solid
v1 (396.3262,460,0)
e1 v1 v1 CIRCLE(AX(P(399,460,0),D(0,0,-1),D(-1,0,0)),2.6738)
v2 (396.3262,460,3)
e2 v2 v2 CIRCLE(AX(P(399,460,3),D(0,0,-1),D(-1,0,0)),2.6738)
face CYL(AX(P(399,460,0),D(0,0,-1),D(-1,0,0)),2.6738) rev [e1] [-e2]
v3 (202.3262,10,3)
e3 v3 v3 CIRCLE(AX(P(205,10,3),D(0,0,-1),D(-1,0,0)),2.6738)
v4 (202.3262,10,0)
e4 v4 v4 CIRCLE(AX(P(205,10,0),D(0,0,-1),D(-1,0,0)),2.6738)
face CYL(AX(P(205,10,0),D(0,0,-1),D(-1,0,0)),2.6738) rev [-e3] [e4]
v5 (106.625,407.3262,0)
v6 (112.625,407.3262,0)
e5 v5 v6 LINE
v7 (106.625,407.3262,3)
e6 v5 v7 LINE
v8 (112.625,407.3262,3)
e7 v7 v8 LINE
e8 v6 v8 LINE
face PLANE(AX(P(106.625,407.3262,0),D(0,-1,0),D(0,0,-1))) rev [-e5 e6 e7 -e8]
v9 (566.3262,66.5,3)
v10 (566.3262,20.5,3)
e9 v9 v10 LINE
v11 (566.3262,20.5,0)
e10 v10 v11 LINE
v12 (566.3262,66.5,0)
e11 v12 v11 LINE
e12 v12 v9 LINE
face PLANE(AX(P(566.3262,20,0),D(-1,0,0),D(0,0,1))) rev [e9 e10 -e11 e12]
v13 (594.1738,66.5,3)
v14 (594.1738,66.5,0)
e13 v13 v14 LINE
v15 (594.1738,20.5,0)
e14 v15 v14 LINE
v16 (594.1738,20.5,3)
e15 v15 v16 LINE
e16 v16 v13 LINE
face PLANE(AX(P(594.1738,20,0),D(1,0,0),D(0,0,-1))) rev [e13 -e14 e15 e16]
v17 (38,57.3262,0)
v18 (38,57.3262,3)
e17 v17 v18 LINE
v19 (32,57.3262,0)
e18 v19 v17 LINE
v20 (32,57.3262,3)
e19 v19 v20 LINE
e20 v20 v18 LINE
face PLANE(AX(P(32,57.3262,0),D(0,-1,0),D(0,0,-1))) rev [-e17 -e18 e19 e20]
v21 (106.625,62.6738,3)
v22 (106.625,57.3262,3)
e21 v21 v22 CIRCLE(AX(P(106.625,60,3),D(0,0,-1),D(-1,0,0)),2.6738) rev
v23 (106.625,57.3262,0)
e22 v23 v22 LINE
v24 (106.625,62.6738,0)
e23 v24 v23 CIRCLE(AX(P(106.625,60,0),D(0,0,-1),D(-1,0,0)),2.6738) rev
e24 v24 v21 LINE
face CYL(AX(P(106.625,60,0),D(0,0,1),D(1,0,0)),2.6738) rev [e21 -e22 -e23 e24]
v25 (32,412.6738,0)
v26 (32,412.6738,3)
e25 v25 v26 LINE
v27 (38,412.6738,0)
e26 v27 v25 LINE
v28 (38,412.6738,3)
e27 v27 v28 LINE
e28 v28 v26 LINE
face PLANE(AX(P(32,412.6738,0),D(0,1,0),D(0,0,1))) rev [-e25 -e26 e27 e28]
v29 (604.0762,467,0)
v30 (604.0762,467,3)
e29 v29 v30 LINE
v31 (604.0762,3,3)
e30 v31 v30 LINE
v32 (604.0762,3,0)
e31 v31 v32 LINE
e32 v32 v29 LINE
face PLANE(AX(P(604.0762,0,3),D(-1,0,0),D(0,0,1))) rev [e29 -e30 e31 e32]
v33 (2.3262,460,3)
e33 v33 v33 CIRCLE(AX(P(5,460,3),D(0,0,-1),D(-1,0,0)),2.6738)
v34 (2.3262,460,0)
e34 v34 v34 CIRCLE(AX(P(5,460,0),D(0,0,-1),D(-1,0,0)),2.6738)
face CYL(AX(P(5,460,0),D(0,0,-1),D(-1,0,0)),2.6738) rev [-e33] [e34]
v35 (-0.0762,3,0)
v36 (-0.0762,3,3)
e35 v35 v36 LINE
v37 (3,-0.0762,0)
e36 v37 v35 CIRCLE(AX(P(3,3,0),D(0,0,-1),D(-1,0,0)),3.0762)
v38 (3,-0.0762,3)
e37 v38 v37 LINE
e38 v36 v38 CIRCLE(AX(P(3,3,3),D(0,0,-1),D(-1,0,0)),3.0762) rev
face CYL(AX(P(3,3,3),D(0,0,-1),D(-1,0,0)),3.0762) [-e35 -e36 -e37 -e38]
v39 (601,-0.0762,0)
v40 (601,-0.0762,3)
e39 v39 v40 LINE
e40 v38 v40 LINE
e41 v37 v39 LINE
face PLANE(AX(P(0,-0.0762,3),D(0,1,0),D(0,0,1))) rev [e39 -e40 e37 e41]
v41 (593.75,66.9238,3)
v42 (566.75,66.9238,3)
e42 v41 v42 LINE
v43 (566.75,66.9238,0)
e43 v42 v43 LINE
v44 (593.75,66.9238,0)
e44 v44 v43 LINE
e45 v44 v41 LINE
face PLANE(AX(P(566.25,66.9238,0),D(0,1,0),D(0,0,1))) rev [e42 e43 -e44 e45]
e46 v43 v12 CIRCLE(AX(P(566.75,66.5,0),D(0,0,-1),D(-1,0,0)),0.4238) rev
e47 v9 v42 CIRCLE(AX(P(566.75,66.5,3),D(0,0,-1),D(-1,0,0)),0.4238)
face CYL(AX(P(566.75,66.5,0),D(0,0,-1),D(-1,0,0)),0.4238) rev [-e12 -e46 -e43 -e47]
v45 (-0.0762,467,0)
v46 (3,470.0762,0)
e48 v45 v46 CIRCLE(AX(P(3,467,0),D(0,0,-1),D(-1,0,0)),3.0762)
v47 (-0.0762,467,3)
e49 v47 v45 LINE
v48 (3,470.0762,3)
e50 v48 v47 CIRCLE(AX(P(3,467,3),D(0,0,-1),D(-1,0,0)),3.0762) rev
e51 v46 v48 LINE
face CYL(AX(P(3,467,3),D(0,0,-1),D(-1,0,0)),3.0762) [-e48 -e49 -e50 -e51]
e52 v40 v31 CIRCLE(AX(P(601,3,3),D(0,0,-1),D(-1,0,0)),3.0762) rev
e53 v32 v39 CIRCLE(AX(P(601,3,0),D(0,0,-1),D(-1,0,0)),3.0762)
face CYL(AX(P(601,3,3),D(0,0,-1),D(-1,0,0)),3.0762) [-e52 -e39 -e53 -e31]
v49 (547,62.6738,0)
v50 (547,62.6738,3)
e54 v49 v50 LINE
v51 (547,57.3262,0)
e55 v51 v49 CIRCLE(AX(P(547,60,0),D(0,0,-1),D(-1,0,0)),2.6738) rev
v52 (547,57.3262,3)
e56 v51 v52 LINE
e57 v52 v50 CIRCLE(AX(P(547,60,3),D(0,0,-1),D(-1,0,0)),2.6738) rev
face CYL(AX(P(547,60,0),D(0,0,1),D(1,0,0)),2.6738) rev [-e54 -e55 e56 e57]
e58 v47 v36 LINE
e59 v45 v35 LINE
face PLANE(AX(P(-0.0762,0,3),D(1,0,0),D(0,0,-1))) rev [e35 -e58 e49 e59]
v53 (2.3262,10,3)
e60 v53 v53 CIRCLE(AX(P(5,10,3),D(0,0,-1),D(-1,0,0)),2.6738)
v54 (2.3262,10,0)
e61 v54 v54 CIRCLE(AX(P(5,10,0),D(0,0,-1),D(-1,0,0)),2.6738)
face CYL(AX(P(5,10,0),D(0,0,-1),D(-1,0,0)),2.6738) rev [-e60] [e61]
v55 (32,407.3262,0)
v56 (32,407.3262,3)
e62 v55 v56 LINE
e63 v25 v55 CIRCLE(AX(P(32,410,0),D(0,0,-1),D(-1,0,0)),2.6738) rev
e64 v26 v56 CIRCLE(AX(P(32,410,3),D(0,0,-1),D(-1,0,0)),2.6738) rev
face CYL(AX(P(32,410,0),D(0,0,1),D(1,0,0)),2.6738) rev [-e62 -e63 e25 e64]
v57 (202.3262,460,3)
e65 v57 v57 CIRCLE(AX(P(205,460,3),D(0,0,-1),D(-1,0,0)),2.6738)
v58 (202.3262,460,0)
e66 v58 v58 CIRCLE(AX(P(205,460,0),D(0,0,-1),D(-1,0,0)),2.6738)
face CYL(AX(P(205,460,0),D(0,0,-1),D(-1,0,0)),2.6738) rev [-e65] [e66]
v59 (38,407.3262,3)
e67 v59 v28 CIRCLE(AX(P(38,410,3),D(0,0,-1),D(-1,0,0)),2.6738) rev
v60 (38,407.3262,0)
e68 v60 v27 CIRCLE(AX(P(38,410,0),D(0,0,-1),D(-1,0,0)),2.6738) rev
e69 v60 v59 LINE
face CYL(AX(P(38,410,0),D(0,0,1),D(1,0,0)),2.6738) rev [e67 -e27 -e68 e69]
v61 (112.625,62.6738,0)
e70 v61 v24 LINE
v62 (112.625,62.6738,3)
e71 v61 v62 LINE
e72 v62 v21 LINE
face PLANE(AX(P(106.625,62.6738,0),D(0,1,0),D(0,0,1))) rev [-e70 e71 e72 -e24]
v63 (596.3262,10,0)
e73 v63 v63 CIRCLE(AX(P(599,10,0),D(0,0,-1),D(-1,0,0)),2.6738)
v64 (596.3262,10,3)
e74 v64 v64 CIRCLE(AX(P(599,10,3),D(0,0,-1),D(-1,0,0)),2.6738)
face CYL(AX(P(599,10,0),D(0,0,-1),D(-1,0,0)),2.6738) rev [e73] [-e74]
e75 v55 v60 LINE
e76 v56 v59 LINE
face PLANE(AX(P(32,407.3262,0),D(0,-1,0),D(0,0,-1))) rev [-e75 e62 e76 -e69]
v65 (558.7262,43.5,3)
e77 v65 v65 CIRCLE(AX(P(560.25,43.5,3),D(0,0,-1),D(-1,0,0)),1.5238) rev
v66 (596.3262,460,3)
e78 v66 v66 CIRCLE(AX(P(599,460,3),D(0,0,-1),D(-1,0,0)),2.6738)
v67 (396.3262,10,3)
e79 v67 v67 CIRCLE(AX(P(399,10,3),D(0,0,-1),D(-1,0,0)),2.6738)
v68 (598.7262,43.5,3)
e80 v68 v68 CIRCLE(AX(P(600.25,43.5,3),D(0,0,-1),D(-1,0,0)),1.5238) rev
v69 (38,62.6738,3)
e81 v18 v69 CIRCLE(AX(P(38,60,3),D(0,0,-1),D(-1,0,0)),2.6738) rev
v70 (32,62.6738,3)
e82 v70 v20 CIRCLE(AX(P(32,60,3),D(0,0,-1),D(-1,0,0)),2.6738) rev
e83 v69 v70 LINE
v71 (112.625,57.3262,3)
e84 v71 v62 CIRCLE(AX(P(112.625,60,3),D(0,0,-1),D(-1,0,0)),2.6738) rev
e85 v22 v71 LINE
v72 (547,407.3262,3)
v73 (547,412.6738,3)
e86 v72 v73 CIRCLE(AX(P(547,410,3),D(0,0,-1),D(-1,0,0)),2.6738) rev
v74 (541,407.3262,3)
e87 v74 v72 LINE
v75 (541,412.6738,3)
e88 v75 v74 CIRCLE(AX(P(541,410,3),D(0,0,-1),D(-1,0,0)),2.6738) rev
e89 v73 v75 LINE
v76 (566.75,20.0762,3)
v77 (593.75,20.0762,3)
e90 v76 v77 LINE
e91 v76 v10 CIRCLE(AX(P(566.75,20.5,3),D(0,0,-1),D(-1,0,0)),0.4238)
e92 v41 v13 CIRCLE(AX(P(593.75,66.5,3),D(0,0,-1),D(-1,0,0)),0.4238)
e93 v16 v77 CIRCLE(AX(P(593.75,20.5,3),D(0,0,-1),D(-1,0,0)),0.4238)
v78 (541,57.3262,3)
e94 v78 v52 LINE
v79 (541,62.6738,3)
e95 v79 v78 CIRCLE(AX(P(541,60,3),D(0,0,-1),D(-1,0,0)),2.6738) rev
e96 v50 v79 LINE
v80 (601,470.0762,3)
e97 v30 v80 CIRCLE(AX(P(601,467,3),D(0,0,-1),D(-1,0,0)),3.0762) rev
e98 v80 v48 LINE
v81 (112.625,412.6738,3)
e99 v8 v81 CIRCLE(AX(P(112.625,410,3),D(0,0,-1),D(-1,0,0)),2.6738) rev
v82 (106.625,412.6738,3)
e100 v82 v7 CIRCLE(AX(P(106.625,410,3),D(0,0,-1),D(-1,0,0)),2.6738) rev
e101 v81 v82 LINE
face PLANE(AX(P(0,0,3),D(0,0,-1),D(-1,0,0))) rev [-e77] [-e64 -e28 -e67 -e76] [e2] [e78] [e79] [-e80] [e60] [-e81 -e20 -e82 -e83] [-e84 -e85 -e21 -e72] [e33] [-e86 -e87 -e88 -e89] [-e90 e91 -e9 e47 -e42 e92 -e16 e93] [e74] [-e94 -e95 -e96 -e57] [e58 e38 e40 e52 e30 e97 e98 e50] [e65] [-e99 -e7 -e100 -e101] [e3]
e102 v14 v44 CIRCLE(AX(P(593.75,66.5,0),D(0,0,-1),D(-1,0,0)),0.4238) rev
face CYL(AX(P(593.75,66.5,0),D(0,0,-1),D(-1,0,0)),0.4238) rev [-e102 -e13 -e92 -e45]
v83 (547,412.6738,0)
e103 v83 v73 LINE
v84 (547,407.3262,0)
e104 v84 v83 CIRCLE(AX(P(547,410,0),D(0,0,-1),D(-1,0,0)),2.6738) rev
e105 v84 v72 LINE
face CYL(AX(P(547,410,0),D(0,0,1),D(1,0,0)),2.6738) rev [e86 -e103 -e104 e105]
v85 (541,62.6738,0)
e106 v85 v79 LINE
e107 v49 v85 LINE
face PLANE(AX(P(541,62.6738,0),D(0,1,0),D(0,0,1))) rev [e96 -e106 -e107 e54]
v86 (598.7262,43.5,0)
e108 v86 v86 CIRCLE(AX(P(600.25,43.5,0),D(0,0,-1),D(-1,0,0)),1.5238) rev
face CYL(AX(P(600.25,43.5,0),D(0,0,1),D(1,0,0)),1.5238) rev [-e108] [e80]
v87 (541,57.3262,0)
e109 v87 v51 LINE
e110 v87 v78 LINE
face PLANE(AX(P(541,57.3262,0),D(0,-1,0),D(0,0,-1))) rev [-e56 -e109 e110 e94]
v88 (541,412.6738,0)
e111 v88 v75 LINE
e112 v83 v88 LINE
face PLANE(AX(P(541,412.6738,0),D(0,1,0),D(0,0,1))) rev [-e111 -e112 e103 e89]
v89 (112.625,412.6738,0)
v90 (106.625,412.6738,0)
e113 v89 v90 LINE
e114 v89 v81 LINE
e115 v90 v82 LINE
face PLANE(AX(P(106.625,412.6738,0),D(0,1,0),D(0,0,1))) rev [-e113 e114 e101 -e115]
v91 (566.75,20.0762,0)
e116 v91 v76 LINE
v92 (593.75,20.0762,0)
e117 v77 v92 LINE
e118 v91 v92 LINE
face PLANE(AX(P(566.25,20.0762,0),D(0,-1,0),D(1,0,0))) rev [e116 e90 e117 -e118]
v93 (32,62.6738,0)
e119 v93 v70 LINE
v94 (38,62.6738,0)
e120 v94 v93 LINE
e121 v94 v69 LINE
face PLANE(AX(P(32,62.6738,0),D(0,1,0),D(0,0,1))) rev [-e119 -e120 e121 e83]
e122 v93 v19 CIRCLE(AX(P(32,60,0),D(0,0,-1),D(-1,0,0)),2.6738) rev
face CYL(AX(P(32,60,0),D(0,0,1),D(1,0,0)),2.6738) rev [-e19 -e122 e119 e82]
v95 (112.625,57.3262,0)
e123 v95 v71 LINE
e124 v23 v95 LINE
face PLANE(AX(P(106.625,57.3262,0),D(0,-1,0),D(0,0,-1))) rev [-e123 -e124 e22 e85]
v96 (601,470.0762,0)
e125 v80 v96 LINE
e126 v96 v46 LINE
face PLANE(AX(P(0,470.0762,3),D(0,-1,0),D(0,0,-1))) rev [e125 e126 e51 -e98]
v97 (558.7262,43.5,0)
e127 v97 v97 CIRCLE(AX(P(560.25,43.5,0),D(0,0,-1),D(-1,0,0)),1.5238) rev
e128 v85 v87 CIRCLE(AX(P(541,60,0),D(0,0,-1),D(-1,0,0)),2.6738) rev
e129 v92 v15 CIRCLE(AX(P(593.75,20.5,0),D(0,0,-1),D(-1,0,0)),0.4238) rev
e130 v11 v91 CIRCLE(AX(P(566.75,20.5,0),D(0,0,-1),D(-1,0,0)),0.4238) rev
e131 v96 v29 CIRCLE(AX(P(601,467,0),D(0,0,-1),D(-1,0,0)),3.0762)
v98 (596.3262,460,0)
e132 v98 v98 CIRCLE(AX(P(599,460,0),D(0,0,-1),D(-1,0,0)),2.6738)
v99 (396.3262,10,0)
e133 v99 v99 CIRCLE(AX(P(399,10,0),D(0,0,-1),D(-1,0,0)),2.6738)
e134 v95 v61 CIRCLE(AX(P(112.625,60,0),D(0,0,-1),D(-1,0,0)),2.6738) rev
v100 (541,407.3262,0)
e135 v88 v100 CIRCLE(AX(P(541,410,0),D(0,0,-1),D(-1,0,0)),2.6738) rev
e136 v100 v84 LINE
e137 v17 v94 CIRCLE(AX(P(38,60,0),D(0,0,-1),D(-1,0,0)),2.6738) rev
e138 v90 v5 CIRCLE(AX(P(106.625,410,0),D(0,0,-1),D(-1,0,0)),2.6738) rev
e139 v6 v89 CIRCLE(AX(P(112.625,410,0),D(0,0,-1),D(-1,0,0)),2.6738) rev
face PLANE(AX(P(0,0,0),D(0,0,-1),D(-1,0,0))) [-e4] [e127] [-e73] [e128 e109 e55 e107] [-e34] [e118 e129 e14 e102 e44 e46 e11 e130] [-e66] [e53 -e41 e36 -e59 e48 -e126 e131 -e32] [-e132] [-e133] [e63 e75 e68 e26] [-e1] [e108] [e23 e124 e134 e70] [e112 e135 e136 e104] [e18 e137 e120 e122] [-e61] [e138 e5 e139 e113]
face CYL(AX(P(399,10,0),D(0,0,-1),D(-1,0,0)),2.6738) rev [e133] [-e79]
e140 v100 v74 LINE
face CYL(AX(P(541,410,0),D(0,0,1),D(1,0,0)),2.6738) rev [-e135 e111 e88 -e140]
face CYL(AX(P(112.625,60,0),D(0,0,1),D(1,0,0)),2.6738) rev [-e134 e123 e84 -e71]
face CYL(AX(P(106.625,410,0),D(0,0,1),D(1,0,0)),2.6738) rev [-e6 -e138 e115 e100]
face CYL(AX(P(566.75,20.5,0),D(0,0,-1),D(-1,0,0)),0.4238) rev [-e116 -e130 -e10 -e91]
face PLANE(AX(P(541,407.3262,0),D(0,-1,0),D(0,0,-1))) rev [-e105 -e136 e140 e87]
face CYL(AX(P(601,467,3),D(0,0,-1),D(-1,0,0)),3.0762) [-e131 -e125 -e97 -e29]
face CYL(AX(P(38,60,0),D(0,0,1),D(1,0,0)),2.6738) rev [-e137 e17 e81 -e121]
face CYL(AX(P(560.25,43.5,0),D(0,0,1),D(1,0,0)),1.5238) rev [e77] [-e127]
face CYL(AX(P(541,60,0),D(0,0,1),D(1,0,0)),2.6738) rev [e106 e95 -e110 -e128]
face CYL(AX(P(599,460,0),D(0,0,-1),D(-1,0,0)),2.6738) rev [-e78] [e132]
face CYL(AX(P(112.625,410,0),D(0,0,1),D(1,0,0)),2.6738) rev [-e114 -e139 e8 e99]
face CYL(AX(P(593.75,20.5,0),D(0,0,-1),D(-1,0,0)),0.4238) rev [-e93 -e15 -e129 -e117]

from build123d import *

# Parameters (mm, degrees)
SKETCH1_W              = 604
SKETCH1_H              = 470
BOSS_EXTRUDE1_DEPTH    = 3
FILLET1_R              = 3
M5_CLEARANCE_HOLE1_D   = 5.5
SKETCH5_R              = 1.6
SKETCH5_W              = 28
SKETCH5_H              = 47
CUT_EXTRUDE1_DEPTH     = 766.326727614
FILLET2_R              = 0.5
CUT_EXTRUDE5_DEPTH     = 766.326727614
MOVE_FACE1_OUTLINE_R   = 2.75
MOVE_FACE1_OUTLINE_R_2 = 2.6738
MOVE_FACE1_OUTLINE_R_3 = 1.6
MOVE_FACE1_OUTLINE_R_4 = 1.5238
MOVE_FACE1_DEPTH       = 3


# Read off the part's stored shape, not the designer's step: Move Face1
with BuildPart() as part:
    # Sketch1 → Boss-Extrude1 (new body)
    with BuildSketch(Plane.XY):
        with Locations((302, 235)):
            Rectangle(SKETCH1_W, SKETCH1_H)
    extrude(amount=BOSS_EXTRUDE1_DEPTH)

    # Fillet1
    fillet1_edges = [part.edges().sort_by_distance(p)[0] for p in [
        (0, 470, 1.5),
        (604, 470, 1.5),
        (604, 0, 1.5),
        (0, 0, 1.5),
    ]]
    fillet(fillet1_edges, radius=FILLET1_R)

    # M5 Clearance Hole1 (through all)
    with Locations(Plane(origin=(0, 0, 0), x_dir=(-1, 0, 0), z_dir=(0, 0, -1))):
        with Locations((-599, 460), (-399, 460), (-205, 460), (-5, 460), (-5, 10), (-205, 10), (-399, 10), (-599, 10), (-544, 410), (-544, 60), (-35, 410), (-35, 60), (-109.625, 410), (-109.625, 60)):
            Hole(M5_CLEARANCE_HOLE1_D / 2)

    # Sketch5 → Cut-Extrude1 (cut, through all)
    with BuildSketch(Plane.XY.offset(3)):
        with Locations((560.25, 43.5)):
            Circle(SKETCH5_R)
        with Locations(Location((600.25, 43.5, 0), (0, 0, 180))):
            Circle(SKETCH5_R)
        with Locations((580.25, 43.5)):
            Rectangle(SKETCH5_W, SKETCH5_H)
    extrude(amount=-CUT_EXTRUDE1_DEPTH, mode=Mode.SUBTRACT)

    # Fillet2
    fillet2_edges = [part.edges().sort_by_distance(p)[0] for p in [
        (566.25, 20, 1.5),
        (566.25, 67, 1.5),
        (594.25, 67, 1.5),
        (594.25, 20, 1.5),
    ]]
    fillet(fillet2_edges, radius=FILLET2_R)

    # Sketch9 → Cut-Extrude5 (cut, through all)
    with BuildSketch(Plane.XY.offset(3)):
        with BuildLine():
            Line((32, 412.75), (38, 412.75))
            ThreePointArc((38, 412.75), (40.75, 410), (38, 407.25))
            Line((38, 407.25), (32, 407.25))
            ThreePointArc((32, 407.25), (29.25, 410), (32, 412.75))
        make_face()
        with BuildLine():
            Line((106.625, 412.75), (112.625, 412.75))
            ThreePointArc((112.625, 412.75), (115.375, 410), (112.625, 407.25))
            Line((112.625, 407.25), (106.625, 407.25))
            ThreePointArc((106.625, 407.25), (103.875, 410), (106.625, 412.75))
        make_face()
        with BuildLine():
            Line((32, 62.75), (38, 62.75))
            ThreePointArc((38, 62.75), (40.75, 60), (38, 57.25))
            Line((38, 57.25), (32, 57.25))
            ThreePointArc((32, 57.25), (29.25, 60), (32, 62.75))
        make_face()
        with BuildLine():
            Line((106.625, 62.75), (112.625, 62.75))
            ThreePointArc((112.625, 62.75), (115.375, 60), (112.625, 57.25))
            Line((112.625, 57.25), (106.625, 57.25))
            ThreePointArc((106.625, 57.25), (103.875, 60), (106.625, 62.75))
        make_face()
        with BuildLine():
            Line((541, 412.75), (547, 412.75))
            ThreePointArc((547, 412.75), (549.75, 410), (547, 407.25))
            Line((547, 407.25), (541, 407.25))
            ThreePointArc((541, 407.25), (538.25, 410), (541, 412.75))
        make_face()
        with BuildLine():
            Line((541, 62.75), (547, 62.75))
            ThreePointArc((547, 62.75), (549.75, 60), (547, 57.25))
            Line((547, 57.25), (541, 57.25))
            ThreePointArc((541, 57.25), (538.25, 60), (541, 62.75))
        make_face()
    extrude(amount=-CUT_EXTRUDE5_DEPTH, mode=Mode.SUBTRACT)

    # Move Face1 outline → Move Face1 (add)
    # profile 1 of 18: a face of its own
    with BuildSketch(Plane.XY):
        with BuildLine():
            Line((-0.0762, 467), (-0.0762, 3))
            ThreePointArc((-0.0762, 3), (0.82479812, 0.82479812), (3, -0.0762))
            Line((3, -0.0762), (601, -0.0762))
            ThreePointArc((601, -0.0762), (603.17520188, 0.82479812), (604.0762, 3))
            Line((604.0762, 3), (604.0762, 467))
            ThreePointArc((604.0762, 467), (603.17520188, 469.17520188), (601, 470.0762))
            Line((601, 470.0762), (3, 470.0762))
            ThreePointArc((3, 470.0762), (0.82479812, 469.17520188), (-0.0762, 467))
        make_face()
        with BuildLine():
            ThreePointArc((3, 0), (0.878679656, 0.878679656), (0, 3))
            Line((0, 3), (0, 467))
            ThreePointArc((0, 467), (0.878679656, 469.121320344), (3, 470))
            Line((3, 470), (601, 470))
            ThreePointArc((601, 470), (603.121320344, 469.121320344), (604, 467))
            Line((604, 467), (604, 3))
            ThreePointArc((604, 3), (603.121320344, 0.878679656), (601, 0))
            Line((601, 0), (3, 0))
        make_face(mode=Mode.SUBTRACT)
    # profile 2 of 18: a face of its own
    with BuildSketch(Plane.XY):
        with Locations((599, 10)):
            Circle(MOVE_FACE1_OUTLINE_R)
        with Locations((599, 10)):
            Circle(MOVE_FACE1_OUTLINE_R_2, mode=Mode.SUBTRACT)
    # profile 3 of 18: a face of its own
    with BuildSketch(Plane.XY):
        with Locations((399, 10)):
            Circle(MOVE_FACE1_OUTLINE_R)
        with Locations((399, 10)):
            Circle(MOVE_FACE1_OUTLINE_R_2, mode=Mode.SUBTRACT)
    # profile 4 of 18: a face of its own
    with BuildSketch(Plane.XY):
        with Locations((205, 10)):
            Circle(MOVE_FACE1_OUTLINE_R)
        with Locations((205, 10)):
            Circle(MOVE_FACE1_OUTLINE_R_2, mode=Mode.SUBTRACT)
    # profile 5 of 18: a face of its own
    with BuildSketch(Plane.XY):
        with Locations((5, 10)):
            Circle(MOVE_FACE1_OUTLINE_R)
        with Locations((5, 10)):
            Circle(MOVE_FACE1_OUTLINE_R_2, mode=Mode.SUBTRACT)
    # profile 6 of 18: a face of its own
    with BuildSketch(Plane.XY):
        with Locations((5, 460)):
            Circle(MOVE_FACE1_OUTLINE_R)
        with Locations((5, 460)):
            Circle(MOVE_FACE1_OUTLINE_R_2, mode=Mode.SUBTRACT)
    # profile 7 of 18: a face of its own
    with BuildSketch(Plane.XY):
        with Locations((205, 460)):
            Circle(MOVE_FACE1_OUTLINE_R)
        with Locations((205, 460)):
            Circle(MOVE_FACE1_OUTLINE_R_2, mode=Mode.SUBTRACT)
    # profile 8 of 18: a face of its own
    with BuildSketch(Plane.XY):
        with Locations((399, 460)):
            Circle(MOVE_FACE1_OUTLINE_R)
        with Locations((399, 460)):
            Circle(MOVE_FACE1_OUTLINE_R_2, mode=Mode.SUBTRACT)
    # profile 9 of 18: a face of its own
    with BuildSketch(Plane.XY):
        with Locations((599, 460)):
            Circle(MOVE_FACE1_OUTLINE_R)
        with Locations((599, 460)):
            Circle(MOVE_FACE1_OUTLINE_R_2, mode=Mode.SUBTRACT)
    # profile 10 of 18: a face of its own
    with BuildSketch(Plane.XY):
        with BuildLine():
            ThreePointArc((566.75, 67), (566.396446609, 66.853553391), (566.25, 66.5))
            Line((566.25, 66.5), (566.25, 20.5))
            ThreePointArc((566.25, 20.5), (566.396446609, 20.146446609), (566.75, 20))
            Line((566.75, 20), (593.75, 20))
            ThreePointArc((593.75, 20), (594.103553391, 20.146446609), (594.25, 20.5))
            Line((594.25, 20.5), (594.25, 66.5))
            ThreePointArc((594.25, 66.5), (594.103553391, 66.853553391), (593.75, 67))
            Line((593.75, 67), (566.75, 67))
        make_face()
        with BuildLine():
            Line((566.3262, 20.5), (566.3262, 66.5))
            ThreePointArc((566.3262, 66.5), (566.450328146, 66.799671854), (566.75, 66.9238))
            Line((566.75, 66.9238), (593.75, 66.9238))
            ThreePointArc((593.75, 66.9238), (594.049671854, 66.799671854), (594.1738, 66.5))
            Line((594.1738, 66.5), (594.1738, 20.5))
            ThreePointArc((594.1738, 20.5), (594.049671854, 20.200328146), (593.75, 20.0762))
            Line((593.75, 20.0762), (566.75, 20.0762))
            ThreePointArc((566.75, 20.0762), (566.450328146, 20.200328146), (566.3262, 20.5))
        make_face(mode=Mode.SUBTRACT)
    # profile 11 of 18: a face of its own
    with BuildSketch(Plane.XY):
        with Locations((560.25, 43.5)):
            Circle(MOVE_FACE1_OUTLINE_R_3)
        with Locations((560.25, 43.5)):
            Circle(MOVE_FACE1_OUTLINE_R_4, mode=Mode.SUBTRACT)
    # profile 12 of 18: a face of its own
    with BuildSketch(Plane.XY):
        with Locations((600.25, 43.5)):
            Circle(MOVE_FACE1_OUTLINE_R_3)
        with Locations((600.25, 43.5)):
            Circle(MOVE_FACE1_OUTLINE_R_4, mode=Mode.SUBTRACT)
    # profile 13 of 18: a face of its own
    with BuildSketch(Plane.XY):
        with BuildLine():
            ThreePointArc((38, 407.25), (40.75, 410), (38, 412.75))
            Line((38, 412.75), (32, 412.75))
            ThreePointArc((32, 412.75), (29.25, 410), (32, 407.25))
            Line((32, 407.25), (38, 407.25))
        make_face()
        with BuildLine():
            Line((32, 412.6738), (38, 412.6738))
            ThreePointArc((38, 412.6738), (40.6738, 410), (38, 407.3262))
            Line((38, 407.3262), (32, 407.3262))
            ThreePointArc((32, 407.3262), (29.3262, 410), (32, 412.6738))
        make_face(mode=Mode.SUBTRACT)
    # profile 14 of 18: a face of its own
    with BuildSketch(Plane.XY):
        with BuildLine():
            ThreePointArc((112.625, 407.25), (115.375, 410), (112.625, 412.75))
            Line((112.625, 412.75), (106.625, 412.75))
            ThreePointArc((106.625, 412.75), (103.875, 410), (106.625, 407.25))
            Line((106.625, 407.25), (112.625, 407.25))
        make_face()
        with BuildLine():
            Line((106.625, 412.6738), (112.625, 412.6738))
            ThreePointArc((112.625, 412.6738), (115.2988, 410), (112.625, 407.3262))
            Line((112.625, 407.3262), (106.625, 407.3262))
            ThreePointArc((106.625, 407.3262), (103.9512, 410), (106.625, 412.6738))
        make_face(mode=Mode.SUBTRACT)
    # profile 15 of 18: a face of its own
    with BuildSketch(Plane.XY):
        with BuildLine():
            ThreePointArc((547, 407.25), (549.75, 410), (547, 412.75))
            Line((547, 412.75), (541, 412.75))
            ThreePointArc((541, 412.75), (538.25, 410), (541, 407.25))
            Line((541, 407.25), (547, 407.25))
        make_face()
        with BuildLine():
            Line((541, 412.6738), (547, 412.6738))
            ThreePointArc((547, 412.6738), (549.6738, 410), (547, 407.3262))
            Line((547, 407.3262), (541, 407.3262))
            ThreePointArc((541, 407.3262), (538.3262, 410), (541, 412.6738))
        make_face(mode=Mode.SUBTRACT)
    # profile 16 of 18: a face of its own
    with BuildSketch(Plane.XY):
        with BuildLine():
            ThreePointArc((547, 57.25), (549.75, 60), (547, 62.75))
            Line((547, 62.75), (541, 62.75))
            ThreePointArc((541, 62.75), (538.25, 60), (541, 57.25))
            Line((541, 57.25), (547, 57.25))
        make_face()
        with BuildLine():
            Line((541, 62.6738), (547, 62.6738))
            ThreePointArc((547, 62.6738), (549.6738, 60), (547, 57.3262))
            Line((547, 57.3262), (541, 57.3262))
            ThreePointArc((541, 57.3262), (538.3262, 60), (541, 62.6738))
        make_face(mode=Mode.SUBTRACT)
    # profile 17 of 18: a face of its own
    with BuildSketch(Plane.XY):
        with BuildLine():
            ThreePointArc((38, 57.25), (40.75, 60), (38, 62.75))
            Line((38, 62.75), (32, 62.75))
            ThreePointArc((32, 62.75), (29.25, 60), (32, 57.25))
            Line((32, 57.25), (38, 57.25))
        make_face()
        with BuildLine():
            Line((32, 62.6738), (38, 62.6738))
            ThreePointArc((38, 62.6738), (40.6738, 60), (38, 57.3262))
            Line((38, 57.3262), (32, 57.3262))
            ThreePointArc((32, 57.3262), (29.3262, 60), (32, 62.6738))
        make_face(mode=Mode.SUBTRACT)
    # profile 18 of 18: a face of its own
    with BuildSketch(Plane.XY):
        with BuildLine():
            ThreePointArc((112.625, 57.25), (115.375, 60), (112.625, 62.75))
            Line((112.625, 62.75), (106.625, 62.75))
            ThreePointArc((106.625, 62.75), (103.875, 60), (106.625, 57.25))
            Line((106.625, 57.25), (112.625, 57.25))
        make_face()
        with BuildLine():
            Line((106.625, 62.6738), (112.625, 62.6738))
            ThreePointArc((112.625, 62.6738), (115.2988, 60), (112.625, 57.3262))
            Line((112.625, 57.3262), (106.625, 57.3262))
            ThreePointArc((106.625, 57.3262), (103.9512, 60), (106.625, 62.6738))
        make_face(mode=Mode.SUBTRACT)
    extrude(amount=MOVE_FACE1_DEPTH)


solid = part.part
